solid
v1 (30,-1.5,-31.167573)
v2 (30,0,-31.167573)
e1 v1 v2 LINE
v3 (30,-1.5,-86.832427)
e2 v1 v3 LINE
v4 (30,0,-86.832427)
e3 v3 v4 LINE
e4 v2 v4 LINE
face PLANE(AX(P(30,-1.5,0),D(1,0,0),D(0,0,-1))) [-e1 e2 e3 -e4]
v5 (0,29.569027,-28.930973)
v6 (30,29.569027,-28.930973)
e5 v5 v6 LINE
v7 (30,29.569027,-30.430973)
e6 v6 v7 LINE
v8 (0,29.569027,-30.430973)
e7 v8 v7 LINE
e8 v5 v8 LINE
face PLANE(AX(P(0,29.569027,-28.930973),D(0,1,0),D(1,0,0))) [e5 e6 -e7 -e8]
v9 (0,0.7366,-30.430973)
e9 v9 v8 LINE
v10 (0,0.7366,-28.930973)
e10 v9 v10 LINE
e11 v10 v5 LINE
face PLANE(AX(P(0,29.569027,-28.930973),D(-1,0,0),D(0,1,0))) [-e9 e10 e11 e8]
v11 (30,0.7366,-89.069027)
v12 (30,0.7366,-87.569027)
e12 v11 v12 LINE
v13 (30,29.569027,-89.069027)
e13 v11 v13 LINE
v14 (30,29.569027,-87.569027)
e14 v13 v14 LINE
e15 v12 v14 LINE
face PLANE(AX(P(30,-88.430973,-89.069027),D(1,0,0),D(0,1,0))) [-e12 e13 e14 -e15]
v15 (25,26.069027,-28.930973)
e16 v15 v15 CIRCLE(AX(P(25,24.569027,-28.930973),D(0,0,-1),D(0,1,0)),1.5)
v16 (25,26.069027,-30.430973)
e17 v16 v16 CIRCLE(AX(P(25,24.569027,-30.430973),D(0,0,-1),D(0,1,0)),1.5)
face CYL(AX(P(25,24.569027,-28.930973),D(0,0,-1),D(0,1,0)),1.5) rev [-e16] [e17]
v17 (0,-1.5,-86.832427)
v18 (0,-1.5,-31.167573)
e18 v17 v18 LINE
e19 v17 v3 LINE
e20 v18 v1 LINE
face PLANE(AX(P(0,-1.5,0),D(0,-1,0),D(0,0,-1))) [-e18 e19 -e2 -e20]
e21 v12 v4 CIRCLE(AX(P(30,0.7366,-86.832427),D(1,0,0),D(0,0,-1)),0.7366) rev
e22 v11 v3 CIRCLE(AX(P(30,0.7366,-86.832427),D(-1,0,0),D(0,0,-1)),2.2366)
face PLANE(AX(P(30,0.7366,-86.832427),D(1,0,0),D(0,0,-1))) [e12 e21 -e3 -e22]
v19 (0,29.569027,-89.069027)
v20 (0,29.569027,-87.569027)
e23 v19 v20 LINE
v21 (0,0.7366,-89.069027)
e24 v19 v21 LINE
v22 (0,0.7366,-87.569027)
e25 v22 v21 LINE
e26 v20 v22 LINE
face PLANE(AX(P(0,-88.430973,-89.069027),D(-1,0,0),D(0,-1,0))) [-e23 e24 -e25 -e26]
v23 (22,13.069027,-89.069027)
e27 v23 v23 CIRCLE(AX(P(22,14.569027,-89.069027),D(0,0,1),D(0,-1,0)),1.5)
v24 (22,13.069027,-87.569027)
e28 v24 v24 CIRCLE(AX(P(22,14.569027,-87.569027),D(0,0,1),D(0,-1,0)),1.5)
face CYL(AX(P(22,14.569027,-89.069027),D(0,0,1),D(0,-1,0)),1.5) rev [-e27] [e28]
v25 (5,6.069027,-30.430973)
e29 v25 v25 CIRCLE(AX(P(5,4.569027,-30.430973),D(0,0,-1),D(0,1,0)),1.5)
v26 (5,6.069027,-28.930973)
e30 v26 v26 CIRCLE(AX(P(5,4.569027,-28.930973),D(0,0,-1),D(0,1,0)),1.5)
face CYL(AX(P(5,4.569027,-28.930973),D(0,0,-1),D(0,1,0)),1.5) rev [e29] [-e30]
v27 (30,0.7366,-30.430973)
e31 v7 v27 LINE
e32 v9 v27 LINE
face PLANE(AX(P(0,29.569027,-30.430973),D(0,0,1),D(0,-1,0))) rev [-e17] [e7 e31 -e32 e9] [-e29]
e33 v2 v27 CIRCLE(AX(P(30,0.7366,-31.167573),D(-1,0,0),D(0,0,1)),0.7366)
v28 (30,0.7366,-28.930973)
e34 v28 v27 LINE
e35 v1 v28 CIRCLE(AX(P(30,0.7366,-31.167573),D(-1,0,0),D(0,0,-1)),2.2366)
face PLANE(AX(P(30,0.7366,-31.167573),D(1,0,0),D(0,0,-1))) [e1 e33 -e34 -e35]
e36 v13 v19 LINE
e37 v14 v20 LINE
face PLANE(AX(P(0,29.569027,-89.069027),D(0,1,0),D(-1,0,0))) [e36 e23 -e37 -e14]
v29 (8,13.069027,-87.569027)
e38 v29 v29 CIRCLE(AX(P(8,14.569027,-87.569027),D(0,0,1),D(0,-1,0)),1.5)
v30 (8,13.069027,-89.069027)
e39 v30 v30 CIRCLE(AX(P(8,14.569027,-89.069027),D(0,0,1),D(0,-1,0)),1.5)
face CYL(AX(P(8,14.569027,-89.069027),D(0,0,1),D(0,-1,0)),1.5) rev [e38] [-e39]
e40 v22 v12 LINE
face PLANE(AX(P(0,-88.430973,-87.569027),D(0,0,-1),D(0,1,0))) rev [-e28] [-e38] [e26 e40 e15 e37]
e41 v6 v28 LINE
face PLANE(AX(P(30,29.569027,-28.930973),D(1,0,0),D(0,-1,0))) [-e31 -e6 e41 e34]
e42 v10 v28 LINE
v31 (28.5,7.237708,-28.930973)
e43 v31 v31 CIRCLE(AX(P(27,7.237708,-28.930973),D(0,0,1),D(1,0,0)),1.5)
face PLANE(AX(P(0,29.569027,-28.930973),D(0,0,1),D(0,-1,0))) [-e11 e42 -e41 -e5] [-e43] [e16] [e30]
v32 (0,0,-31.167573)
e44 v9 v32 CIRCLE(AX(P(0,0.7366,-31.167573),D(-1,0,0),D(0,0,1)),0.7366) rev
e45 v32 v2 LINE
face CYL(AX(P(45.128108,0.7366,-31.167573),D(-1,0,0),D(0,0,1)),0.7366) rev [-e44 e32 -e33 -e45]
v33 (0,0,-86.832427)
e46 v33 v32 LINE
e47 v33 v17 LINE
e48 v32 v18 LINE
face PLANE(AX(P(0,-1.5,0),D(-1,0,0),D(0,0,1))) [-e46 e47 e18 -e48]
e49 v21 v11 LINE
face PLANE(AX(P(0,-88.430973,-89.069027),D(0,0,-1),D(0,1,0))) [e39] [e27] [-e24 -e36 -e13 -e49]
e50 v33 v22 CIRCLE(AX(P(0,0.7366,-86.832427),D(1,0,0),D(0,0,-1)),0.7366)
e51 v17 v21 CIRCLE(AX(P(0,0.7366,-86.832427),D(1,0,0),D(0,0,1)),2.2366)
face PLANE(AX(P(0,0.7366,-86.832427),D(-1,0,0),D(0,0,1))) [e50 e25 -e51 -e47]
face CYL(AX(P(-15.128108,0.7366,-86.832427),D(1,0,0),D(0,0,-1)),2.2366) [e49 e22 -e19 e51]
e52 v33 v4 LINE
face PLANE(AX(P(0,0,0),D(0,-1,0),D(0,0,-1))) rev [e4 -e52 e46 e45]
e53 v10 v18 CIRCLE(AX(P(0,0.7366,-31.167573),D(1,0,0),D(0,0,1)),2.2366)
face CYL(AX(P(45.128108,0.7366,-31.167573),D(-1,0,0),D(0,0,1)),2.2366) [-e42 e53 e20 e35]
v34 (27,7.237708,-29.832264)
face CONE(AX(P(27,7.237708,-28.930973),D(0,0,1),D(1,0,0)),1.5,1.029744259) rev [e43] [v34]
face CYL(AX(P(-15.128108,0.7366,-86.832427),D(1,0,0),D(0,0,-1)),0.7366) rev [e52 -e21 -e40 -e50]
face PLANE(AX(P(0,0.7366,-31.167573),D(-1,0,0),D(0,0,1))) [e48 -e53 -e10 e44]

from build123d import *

# Parameters (mm, degrees)
SKETCH1_W                       = 30
SKETCH1_H                       = 118
SKETCH1_R                       = 1.5
BASE_FLANGE1_DEPTH              = 1.5
SKETCHED_BEND1_DEPTH            = 30
SKETCHED_BEND1_2_DEPTH          = 30
SKETCHED_START                  = -89.06902709
SKETCHED_BEND1_3_OUTLINE_R      = 1.5
SKETCHED_BEND1_3_DEPTH          = 1.5
SKETCHED_START_2                = -87.56902709
SKETCHED_BEND1_4_OUTLINE_R      = 1.5
SKETCHED_BEND1_4_DEPTH          = 59.56902709
F_3_0MM_PRESS_DOWEL_HOLE1_D     = 3
F_3_0MM_PRESS_DOWEL_HOLE1_DEPTH = 6
F_3_0MM_PRESS_DOWEL_HOLE1_TIP   = 0.901290929


with BuildPart() as part:
    # Base-Flange1: sheet metal written as solids
    # Sketch1 → Base-Flange1 (new body)
    with BuildSketch(Plane(origin=(0, 0, 0), x_dir=(1, 0, 0), z_dir=(0, 1, 0))):
        with Locations((15, 59)):
            Rectangle(SKETCH1_W, SKETCH1_H)
        with Locations(Location((8, 103, 0), (0, 0, 270))):
            Circle(SKETCH1_R, mode=Mode.SUBTRACT)
        with Locations(Location((22, 103, 0), (0, 0, 270))):
            Circle(SKETCH1_R, mode=Mode.SUBTRACT)
        with Locations(Location((25, 5, 0), (0, 0, 270))):
            Circle(SKETCH1_R, mode=Mode.SUBTRACT)
        with Locations(Location((5, 25, 0), (0, 0, 270))):
            Circle(SKETCH1_R, mode=Mode.SUBTRACT)
    extrude(amount=-BASE_FLANGE1_DEPTH)

    # Sketched Bend1: read off the stored shape, not the designer's step
    # Sketched Bend1 outline → Sketched Bend1 (cut)
    with BuildSketch(Plane.YZ):
        with BuildLine():
            ThreePointArc((0, -88.944250946), (-1.086838938, -88.127591172), (-1.5, -86.83242709))
            Line((-1.5, -86.83242709), (-1.5, -118))
            Line((-1.5, -118), (0, -118))
            Line((0, -118), (0, -88.944250946))
        make_face()
        with BuildLine():
            Line((-1.5, 0), (-1.5, -31.16757291))
            ThreePointArc((-1.5, -31.16757291), (-1.086838938, -29.872408828), (0, -29.055749054))
            Line((0, -29.055749054), (0, 0))
            Line((0, 0), (-1.5, 0))
        make_face()
    extrude(amount=SKETCHED_BEND1_DEPTH, mode=Mode.SUBTRACT)

    # Sketched Bend1 2 outline → Sketched Bend1 2 (add)
    with BuildSketch(Plane.YZ):
        with BuildLine():
            Line((0, -86.83242709), (0, -88.944250946))
            ThreePointArc((0, -88.944250946), (0.363053267, -89.037612433), (0.7366, -89.06902709))
            Line((0.7366, -89.06902709), (29.56902709, -89.06902709))
            Line((29.56902709, -89.06902709), (29.56902709, -87.56902709))
            Line((29.56902709, -87.56902709), (0.7366, -87.56902709))
            ThreePointArc((0.7366, -87.56902709), (0.215745145, -87.353281945), (0, -86.83242709))
        make_face()
        with BuildLine():
            ThreePointArc((0.7366, -28.93097291), (0.363053267, -28.962387567), (0, -29.055749054))
            Line((0, -29.055749054), (0, -31.16757291))
            ThreePointArc((0, -31.16757291), (0.215745145, -30.646718055), (0.7366, -30.43097291))
            Line((0.7366, -30.43097291), (29.56902709, -30.43097291))
            Line((29.56902709, -30.43097291), (29.56902709, -28.93097291))
            Line((29.56902709, -28.93097291), (0.7366, -28.93097291))
        make_face()
    extrude(amount=SKETCHED_BEND1_2_DEPTH)

    # Sketched Bend1 3 outline → Sketched Bend1 3 (cut)
    with BuildSketch(Plane.XY.offset(SKETCHED_START)):
        with Locations((8, 14.56902709)):
            Circle(SKETCHED_BEND1_3_OUTLINE_R)
        with Locations((22, 14.56902709)):
            Circle(SKETCHED_BEND1_3_OUTLINE_R)
    extrude(amount=SKETCHED_BEND1_3_DEPTH, mode=Mode.SUBTRACT)

    # Sketched Bend1 4 outline → Sketched Bend1 4 (cut)
    with BuildSketch(Plane.XY.offset(SKETCHED_START_2)):
        with Locations((5, 4.56902709)):
            Circle(SKETCHED_BEND1_4_OUTLINE_R)
        with Locations((25, 24.56902709)):
            Circle(SKETCHED_BEND1_4_OUTLINE_R)
    extrude(amount=SKETCHED_BEND1_4_DEPTH, mode=Mode.SUBTRACT)

    # Ø3.0mm Press Dowel Hole1
    with Locations(Plane(origin=(257.525513363, 325.031359221, -22.93097291), x_dir=(-1, 0, 0), z_dir=(0, 0, 1))):
        with Locations((220.525513363, 156.531359221), (102.525513363, 181.531359221), (102.525513363, 271.531359221), (89.19270005, 226.531359221), (210.525513363, 317.793651488), (230.525513363, 317.793651488), (252.525513363, 320.462332131), (232.525513363, 300.462332131), (252.525513363, 132.600386311), (232.525513363, 152.600386311), (111.286271896, 136.531359221), (91.286271896, 136.531359221), (41.525513363, 196.432813402), (13.525513363, 196.432813402), (41.525513363, 138.767959221), (13.525513363, 138.767959221), (41.525513363, 256.62990504), (13.525513363, 256.62990504), (41.525513363, 314.294759221), (13.525513363, 314.294759221)):
            Hole(F_3_0MM_PRESS_DOWEL_HOLE1_D / 2, depth=F_3_0MM_PRESS_DOWEL_HOLE1_DEPTH)
            with Locations((0, 0, -(F_3_0MM_PRESS_DOWEL_HOLE1_DEPTH + F_3_0MM_PRESS_DOWEL_HOLE1_TIP / 2))):  # 118° drill point
                Cone(0, F_3_0MM_PRESS_DOWEL_HOLE1_D / 2, F_3_0MM_PRESS_DOWEL_HOLE1_TIP, mode=Mode.SUBTRACT)


solid = part.part
